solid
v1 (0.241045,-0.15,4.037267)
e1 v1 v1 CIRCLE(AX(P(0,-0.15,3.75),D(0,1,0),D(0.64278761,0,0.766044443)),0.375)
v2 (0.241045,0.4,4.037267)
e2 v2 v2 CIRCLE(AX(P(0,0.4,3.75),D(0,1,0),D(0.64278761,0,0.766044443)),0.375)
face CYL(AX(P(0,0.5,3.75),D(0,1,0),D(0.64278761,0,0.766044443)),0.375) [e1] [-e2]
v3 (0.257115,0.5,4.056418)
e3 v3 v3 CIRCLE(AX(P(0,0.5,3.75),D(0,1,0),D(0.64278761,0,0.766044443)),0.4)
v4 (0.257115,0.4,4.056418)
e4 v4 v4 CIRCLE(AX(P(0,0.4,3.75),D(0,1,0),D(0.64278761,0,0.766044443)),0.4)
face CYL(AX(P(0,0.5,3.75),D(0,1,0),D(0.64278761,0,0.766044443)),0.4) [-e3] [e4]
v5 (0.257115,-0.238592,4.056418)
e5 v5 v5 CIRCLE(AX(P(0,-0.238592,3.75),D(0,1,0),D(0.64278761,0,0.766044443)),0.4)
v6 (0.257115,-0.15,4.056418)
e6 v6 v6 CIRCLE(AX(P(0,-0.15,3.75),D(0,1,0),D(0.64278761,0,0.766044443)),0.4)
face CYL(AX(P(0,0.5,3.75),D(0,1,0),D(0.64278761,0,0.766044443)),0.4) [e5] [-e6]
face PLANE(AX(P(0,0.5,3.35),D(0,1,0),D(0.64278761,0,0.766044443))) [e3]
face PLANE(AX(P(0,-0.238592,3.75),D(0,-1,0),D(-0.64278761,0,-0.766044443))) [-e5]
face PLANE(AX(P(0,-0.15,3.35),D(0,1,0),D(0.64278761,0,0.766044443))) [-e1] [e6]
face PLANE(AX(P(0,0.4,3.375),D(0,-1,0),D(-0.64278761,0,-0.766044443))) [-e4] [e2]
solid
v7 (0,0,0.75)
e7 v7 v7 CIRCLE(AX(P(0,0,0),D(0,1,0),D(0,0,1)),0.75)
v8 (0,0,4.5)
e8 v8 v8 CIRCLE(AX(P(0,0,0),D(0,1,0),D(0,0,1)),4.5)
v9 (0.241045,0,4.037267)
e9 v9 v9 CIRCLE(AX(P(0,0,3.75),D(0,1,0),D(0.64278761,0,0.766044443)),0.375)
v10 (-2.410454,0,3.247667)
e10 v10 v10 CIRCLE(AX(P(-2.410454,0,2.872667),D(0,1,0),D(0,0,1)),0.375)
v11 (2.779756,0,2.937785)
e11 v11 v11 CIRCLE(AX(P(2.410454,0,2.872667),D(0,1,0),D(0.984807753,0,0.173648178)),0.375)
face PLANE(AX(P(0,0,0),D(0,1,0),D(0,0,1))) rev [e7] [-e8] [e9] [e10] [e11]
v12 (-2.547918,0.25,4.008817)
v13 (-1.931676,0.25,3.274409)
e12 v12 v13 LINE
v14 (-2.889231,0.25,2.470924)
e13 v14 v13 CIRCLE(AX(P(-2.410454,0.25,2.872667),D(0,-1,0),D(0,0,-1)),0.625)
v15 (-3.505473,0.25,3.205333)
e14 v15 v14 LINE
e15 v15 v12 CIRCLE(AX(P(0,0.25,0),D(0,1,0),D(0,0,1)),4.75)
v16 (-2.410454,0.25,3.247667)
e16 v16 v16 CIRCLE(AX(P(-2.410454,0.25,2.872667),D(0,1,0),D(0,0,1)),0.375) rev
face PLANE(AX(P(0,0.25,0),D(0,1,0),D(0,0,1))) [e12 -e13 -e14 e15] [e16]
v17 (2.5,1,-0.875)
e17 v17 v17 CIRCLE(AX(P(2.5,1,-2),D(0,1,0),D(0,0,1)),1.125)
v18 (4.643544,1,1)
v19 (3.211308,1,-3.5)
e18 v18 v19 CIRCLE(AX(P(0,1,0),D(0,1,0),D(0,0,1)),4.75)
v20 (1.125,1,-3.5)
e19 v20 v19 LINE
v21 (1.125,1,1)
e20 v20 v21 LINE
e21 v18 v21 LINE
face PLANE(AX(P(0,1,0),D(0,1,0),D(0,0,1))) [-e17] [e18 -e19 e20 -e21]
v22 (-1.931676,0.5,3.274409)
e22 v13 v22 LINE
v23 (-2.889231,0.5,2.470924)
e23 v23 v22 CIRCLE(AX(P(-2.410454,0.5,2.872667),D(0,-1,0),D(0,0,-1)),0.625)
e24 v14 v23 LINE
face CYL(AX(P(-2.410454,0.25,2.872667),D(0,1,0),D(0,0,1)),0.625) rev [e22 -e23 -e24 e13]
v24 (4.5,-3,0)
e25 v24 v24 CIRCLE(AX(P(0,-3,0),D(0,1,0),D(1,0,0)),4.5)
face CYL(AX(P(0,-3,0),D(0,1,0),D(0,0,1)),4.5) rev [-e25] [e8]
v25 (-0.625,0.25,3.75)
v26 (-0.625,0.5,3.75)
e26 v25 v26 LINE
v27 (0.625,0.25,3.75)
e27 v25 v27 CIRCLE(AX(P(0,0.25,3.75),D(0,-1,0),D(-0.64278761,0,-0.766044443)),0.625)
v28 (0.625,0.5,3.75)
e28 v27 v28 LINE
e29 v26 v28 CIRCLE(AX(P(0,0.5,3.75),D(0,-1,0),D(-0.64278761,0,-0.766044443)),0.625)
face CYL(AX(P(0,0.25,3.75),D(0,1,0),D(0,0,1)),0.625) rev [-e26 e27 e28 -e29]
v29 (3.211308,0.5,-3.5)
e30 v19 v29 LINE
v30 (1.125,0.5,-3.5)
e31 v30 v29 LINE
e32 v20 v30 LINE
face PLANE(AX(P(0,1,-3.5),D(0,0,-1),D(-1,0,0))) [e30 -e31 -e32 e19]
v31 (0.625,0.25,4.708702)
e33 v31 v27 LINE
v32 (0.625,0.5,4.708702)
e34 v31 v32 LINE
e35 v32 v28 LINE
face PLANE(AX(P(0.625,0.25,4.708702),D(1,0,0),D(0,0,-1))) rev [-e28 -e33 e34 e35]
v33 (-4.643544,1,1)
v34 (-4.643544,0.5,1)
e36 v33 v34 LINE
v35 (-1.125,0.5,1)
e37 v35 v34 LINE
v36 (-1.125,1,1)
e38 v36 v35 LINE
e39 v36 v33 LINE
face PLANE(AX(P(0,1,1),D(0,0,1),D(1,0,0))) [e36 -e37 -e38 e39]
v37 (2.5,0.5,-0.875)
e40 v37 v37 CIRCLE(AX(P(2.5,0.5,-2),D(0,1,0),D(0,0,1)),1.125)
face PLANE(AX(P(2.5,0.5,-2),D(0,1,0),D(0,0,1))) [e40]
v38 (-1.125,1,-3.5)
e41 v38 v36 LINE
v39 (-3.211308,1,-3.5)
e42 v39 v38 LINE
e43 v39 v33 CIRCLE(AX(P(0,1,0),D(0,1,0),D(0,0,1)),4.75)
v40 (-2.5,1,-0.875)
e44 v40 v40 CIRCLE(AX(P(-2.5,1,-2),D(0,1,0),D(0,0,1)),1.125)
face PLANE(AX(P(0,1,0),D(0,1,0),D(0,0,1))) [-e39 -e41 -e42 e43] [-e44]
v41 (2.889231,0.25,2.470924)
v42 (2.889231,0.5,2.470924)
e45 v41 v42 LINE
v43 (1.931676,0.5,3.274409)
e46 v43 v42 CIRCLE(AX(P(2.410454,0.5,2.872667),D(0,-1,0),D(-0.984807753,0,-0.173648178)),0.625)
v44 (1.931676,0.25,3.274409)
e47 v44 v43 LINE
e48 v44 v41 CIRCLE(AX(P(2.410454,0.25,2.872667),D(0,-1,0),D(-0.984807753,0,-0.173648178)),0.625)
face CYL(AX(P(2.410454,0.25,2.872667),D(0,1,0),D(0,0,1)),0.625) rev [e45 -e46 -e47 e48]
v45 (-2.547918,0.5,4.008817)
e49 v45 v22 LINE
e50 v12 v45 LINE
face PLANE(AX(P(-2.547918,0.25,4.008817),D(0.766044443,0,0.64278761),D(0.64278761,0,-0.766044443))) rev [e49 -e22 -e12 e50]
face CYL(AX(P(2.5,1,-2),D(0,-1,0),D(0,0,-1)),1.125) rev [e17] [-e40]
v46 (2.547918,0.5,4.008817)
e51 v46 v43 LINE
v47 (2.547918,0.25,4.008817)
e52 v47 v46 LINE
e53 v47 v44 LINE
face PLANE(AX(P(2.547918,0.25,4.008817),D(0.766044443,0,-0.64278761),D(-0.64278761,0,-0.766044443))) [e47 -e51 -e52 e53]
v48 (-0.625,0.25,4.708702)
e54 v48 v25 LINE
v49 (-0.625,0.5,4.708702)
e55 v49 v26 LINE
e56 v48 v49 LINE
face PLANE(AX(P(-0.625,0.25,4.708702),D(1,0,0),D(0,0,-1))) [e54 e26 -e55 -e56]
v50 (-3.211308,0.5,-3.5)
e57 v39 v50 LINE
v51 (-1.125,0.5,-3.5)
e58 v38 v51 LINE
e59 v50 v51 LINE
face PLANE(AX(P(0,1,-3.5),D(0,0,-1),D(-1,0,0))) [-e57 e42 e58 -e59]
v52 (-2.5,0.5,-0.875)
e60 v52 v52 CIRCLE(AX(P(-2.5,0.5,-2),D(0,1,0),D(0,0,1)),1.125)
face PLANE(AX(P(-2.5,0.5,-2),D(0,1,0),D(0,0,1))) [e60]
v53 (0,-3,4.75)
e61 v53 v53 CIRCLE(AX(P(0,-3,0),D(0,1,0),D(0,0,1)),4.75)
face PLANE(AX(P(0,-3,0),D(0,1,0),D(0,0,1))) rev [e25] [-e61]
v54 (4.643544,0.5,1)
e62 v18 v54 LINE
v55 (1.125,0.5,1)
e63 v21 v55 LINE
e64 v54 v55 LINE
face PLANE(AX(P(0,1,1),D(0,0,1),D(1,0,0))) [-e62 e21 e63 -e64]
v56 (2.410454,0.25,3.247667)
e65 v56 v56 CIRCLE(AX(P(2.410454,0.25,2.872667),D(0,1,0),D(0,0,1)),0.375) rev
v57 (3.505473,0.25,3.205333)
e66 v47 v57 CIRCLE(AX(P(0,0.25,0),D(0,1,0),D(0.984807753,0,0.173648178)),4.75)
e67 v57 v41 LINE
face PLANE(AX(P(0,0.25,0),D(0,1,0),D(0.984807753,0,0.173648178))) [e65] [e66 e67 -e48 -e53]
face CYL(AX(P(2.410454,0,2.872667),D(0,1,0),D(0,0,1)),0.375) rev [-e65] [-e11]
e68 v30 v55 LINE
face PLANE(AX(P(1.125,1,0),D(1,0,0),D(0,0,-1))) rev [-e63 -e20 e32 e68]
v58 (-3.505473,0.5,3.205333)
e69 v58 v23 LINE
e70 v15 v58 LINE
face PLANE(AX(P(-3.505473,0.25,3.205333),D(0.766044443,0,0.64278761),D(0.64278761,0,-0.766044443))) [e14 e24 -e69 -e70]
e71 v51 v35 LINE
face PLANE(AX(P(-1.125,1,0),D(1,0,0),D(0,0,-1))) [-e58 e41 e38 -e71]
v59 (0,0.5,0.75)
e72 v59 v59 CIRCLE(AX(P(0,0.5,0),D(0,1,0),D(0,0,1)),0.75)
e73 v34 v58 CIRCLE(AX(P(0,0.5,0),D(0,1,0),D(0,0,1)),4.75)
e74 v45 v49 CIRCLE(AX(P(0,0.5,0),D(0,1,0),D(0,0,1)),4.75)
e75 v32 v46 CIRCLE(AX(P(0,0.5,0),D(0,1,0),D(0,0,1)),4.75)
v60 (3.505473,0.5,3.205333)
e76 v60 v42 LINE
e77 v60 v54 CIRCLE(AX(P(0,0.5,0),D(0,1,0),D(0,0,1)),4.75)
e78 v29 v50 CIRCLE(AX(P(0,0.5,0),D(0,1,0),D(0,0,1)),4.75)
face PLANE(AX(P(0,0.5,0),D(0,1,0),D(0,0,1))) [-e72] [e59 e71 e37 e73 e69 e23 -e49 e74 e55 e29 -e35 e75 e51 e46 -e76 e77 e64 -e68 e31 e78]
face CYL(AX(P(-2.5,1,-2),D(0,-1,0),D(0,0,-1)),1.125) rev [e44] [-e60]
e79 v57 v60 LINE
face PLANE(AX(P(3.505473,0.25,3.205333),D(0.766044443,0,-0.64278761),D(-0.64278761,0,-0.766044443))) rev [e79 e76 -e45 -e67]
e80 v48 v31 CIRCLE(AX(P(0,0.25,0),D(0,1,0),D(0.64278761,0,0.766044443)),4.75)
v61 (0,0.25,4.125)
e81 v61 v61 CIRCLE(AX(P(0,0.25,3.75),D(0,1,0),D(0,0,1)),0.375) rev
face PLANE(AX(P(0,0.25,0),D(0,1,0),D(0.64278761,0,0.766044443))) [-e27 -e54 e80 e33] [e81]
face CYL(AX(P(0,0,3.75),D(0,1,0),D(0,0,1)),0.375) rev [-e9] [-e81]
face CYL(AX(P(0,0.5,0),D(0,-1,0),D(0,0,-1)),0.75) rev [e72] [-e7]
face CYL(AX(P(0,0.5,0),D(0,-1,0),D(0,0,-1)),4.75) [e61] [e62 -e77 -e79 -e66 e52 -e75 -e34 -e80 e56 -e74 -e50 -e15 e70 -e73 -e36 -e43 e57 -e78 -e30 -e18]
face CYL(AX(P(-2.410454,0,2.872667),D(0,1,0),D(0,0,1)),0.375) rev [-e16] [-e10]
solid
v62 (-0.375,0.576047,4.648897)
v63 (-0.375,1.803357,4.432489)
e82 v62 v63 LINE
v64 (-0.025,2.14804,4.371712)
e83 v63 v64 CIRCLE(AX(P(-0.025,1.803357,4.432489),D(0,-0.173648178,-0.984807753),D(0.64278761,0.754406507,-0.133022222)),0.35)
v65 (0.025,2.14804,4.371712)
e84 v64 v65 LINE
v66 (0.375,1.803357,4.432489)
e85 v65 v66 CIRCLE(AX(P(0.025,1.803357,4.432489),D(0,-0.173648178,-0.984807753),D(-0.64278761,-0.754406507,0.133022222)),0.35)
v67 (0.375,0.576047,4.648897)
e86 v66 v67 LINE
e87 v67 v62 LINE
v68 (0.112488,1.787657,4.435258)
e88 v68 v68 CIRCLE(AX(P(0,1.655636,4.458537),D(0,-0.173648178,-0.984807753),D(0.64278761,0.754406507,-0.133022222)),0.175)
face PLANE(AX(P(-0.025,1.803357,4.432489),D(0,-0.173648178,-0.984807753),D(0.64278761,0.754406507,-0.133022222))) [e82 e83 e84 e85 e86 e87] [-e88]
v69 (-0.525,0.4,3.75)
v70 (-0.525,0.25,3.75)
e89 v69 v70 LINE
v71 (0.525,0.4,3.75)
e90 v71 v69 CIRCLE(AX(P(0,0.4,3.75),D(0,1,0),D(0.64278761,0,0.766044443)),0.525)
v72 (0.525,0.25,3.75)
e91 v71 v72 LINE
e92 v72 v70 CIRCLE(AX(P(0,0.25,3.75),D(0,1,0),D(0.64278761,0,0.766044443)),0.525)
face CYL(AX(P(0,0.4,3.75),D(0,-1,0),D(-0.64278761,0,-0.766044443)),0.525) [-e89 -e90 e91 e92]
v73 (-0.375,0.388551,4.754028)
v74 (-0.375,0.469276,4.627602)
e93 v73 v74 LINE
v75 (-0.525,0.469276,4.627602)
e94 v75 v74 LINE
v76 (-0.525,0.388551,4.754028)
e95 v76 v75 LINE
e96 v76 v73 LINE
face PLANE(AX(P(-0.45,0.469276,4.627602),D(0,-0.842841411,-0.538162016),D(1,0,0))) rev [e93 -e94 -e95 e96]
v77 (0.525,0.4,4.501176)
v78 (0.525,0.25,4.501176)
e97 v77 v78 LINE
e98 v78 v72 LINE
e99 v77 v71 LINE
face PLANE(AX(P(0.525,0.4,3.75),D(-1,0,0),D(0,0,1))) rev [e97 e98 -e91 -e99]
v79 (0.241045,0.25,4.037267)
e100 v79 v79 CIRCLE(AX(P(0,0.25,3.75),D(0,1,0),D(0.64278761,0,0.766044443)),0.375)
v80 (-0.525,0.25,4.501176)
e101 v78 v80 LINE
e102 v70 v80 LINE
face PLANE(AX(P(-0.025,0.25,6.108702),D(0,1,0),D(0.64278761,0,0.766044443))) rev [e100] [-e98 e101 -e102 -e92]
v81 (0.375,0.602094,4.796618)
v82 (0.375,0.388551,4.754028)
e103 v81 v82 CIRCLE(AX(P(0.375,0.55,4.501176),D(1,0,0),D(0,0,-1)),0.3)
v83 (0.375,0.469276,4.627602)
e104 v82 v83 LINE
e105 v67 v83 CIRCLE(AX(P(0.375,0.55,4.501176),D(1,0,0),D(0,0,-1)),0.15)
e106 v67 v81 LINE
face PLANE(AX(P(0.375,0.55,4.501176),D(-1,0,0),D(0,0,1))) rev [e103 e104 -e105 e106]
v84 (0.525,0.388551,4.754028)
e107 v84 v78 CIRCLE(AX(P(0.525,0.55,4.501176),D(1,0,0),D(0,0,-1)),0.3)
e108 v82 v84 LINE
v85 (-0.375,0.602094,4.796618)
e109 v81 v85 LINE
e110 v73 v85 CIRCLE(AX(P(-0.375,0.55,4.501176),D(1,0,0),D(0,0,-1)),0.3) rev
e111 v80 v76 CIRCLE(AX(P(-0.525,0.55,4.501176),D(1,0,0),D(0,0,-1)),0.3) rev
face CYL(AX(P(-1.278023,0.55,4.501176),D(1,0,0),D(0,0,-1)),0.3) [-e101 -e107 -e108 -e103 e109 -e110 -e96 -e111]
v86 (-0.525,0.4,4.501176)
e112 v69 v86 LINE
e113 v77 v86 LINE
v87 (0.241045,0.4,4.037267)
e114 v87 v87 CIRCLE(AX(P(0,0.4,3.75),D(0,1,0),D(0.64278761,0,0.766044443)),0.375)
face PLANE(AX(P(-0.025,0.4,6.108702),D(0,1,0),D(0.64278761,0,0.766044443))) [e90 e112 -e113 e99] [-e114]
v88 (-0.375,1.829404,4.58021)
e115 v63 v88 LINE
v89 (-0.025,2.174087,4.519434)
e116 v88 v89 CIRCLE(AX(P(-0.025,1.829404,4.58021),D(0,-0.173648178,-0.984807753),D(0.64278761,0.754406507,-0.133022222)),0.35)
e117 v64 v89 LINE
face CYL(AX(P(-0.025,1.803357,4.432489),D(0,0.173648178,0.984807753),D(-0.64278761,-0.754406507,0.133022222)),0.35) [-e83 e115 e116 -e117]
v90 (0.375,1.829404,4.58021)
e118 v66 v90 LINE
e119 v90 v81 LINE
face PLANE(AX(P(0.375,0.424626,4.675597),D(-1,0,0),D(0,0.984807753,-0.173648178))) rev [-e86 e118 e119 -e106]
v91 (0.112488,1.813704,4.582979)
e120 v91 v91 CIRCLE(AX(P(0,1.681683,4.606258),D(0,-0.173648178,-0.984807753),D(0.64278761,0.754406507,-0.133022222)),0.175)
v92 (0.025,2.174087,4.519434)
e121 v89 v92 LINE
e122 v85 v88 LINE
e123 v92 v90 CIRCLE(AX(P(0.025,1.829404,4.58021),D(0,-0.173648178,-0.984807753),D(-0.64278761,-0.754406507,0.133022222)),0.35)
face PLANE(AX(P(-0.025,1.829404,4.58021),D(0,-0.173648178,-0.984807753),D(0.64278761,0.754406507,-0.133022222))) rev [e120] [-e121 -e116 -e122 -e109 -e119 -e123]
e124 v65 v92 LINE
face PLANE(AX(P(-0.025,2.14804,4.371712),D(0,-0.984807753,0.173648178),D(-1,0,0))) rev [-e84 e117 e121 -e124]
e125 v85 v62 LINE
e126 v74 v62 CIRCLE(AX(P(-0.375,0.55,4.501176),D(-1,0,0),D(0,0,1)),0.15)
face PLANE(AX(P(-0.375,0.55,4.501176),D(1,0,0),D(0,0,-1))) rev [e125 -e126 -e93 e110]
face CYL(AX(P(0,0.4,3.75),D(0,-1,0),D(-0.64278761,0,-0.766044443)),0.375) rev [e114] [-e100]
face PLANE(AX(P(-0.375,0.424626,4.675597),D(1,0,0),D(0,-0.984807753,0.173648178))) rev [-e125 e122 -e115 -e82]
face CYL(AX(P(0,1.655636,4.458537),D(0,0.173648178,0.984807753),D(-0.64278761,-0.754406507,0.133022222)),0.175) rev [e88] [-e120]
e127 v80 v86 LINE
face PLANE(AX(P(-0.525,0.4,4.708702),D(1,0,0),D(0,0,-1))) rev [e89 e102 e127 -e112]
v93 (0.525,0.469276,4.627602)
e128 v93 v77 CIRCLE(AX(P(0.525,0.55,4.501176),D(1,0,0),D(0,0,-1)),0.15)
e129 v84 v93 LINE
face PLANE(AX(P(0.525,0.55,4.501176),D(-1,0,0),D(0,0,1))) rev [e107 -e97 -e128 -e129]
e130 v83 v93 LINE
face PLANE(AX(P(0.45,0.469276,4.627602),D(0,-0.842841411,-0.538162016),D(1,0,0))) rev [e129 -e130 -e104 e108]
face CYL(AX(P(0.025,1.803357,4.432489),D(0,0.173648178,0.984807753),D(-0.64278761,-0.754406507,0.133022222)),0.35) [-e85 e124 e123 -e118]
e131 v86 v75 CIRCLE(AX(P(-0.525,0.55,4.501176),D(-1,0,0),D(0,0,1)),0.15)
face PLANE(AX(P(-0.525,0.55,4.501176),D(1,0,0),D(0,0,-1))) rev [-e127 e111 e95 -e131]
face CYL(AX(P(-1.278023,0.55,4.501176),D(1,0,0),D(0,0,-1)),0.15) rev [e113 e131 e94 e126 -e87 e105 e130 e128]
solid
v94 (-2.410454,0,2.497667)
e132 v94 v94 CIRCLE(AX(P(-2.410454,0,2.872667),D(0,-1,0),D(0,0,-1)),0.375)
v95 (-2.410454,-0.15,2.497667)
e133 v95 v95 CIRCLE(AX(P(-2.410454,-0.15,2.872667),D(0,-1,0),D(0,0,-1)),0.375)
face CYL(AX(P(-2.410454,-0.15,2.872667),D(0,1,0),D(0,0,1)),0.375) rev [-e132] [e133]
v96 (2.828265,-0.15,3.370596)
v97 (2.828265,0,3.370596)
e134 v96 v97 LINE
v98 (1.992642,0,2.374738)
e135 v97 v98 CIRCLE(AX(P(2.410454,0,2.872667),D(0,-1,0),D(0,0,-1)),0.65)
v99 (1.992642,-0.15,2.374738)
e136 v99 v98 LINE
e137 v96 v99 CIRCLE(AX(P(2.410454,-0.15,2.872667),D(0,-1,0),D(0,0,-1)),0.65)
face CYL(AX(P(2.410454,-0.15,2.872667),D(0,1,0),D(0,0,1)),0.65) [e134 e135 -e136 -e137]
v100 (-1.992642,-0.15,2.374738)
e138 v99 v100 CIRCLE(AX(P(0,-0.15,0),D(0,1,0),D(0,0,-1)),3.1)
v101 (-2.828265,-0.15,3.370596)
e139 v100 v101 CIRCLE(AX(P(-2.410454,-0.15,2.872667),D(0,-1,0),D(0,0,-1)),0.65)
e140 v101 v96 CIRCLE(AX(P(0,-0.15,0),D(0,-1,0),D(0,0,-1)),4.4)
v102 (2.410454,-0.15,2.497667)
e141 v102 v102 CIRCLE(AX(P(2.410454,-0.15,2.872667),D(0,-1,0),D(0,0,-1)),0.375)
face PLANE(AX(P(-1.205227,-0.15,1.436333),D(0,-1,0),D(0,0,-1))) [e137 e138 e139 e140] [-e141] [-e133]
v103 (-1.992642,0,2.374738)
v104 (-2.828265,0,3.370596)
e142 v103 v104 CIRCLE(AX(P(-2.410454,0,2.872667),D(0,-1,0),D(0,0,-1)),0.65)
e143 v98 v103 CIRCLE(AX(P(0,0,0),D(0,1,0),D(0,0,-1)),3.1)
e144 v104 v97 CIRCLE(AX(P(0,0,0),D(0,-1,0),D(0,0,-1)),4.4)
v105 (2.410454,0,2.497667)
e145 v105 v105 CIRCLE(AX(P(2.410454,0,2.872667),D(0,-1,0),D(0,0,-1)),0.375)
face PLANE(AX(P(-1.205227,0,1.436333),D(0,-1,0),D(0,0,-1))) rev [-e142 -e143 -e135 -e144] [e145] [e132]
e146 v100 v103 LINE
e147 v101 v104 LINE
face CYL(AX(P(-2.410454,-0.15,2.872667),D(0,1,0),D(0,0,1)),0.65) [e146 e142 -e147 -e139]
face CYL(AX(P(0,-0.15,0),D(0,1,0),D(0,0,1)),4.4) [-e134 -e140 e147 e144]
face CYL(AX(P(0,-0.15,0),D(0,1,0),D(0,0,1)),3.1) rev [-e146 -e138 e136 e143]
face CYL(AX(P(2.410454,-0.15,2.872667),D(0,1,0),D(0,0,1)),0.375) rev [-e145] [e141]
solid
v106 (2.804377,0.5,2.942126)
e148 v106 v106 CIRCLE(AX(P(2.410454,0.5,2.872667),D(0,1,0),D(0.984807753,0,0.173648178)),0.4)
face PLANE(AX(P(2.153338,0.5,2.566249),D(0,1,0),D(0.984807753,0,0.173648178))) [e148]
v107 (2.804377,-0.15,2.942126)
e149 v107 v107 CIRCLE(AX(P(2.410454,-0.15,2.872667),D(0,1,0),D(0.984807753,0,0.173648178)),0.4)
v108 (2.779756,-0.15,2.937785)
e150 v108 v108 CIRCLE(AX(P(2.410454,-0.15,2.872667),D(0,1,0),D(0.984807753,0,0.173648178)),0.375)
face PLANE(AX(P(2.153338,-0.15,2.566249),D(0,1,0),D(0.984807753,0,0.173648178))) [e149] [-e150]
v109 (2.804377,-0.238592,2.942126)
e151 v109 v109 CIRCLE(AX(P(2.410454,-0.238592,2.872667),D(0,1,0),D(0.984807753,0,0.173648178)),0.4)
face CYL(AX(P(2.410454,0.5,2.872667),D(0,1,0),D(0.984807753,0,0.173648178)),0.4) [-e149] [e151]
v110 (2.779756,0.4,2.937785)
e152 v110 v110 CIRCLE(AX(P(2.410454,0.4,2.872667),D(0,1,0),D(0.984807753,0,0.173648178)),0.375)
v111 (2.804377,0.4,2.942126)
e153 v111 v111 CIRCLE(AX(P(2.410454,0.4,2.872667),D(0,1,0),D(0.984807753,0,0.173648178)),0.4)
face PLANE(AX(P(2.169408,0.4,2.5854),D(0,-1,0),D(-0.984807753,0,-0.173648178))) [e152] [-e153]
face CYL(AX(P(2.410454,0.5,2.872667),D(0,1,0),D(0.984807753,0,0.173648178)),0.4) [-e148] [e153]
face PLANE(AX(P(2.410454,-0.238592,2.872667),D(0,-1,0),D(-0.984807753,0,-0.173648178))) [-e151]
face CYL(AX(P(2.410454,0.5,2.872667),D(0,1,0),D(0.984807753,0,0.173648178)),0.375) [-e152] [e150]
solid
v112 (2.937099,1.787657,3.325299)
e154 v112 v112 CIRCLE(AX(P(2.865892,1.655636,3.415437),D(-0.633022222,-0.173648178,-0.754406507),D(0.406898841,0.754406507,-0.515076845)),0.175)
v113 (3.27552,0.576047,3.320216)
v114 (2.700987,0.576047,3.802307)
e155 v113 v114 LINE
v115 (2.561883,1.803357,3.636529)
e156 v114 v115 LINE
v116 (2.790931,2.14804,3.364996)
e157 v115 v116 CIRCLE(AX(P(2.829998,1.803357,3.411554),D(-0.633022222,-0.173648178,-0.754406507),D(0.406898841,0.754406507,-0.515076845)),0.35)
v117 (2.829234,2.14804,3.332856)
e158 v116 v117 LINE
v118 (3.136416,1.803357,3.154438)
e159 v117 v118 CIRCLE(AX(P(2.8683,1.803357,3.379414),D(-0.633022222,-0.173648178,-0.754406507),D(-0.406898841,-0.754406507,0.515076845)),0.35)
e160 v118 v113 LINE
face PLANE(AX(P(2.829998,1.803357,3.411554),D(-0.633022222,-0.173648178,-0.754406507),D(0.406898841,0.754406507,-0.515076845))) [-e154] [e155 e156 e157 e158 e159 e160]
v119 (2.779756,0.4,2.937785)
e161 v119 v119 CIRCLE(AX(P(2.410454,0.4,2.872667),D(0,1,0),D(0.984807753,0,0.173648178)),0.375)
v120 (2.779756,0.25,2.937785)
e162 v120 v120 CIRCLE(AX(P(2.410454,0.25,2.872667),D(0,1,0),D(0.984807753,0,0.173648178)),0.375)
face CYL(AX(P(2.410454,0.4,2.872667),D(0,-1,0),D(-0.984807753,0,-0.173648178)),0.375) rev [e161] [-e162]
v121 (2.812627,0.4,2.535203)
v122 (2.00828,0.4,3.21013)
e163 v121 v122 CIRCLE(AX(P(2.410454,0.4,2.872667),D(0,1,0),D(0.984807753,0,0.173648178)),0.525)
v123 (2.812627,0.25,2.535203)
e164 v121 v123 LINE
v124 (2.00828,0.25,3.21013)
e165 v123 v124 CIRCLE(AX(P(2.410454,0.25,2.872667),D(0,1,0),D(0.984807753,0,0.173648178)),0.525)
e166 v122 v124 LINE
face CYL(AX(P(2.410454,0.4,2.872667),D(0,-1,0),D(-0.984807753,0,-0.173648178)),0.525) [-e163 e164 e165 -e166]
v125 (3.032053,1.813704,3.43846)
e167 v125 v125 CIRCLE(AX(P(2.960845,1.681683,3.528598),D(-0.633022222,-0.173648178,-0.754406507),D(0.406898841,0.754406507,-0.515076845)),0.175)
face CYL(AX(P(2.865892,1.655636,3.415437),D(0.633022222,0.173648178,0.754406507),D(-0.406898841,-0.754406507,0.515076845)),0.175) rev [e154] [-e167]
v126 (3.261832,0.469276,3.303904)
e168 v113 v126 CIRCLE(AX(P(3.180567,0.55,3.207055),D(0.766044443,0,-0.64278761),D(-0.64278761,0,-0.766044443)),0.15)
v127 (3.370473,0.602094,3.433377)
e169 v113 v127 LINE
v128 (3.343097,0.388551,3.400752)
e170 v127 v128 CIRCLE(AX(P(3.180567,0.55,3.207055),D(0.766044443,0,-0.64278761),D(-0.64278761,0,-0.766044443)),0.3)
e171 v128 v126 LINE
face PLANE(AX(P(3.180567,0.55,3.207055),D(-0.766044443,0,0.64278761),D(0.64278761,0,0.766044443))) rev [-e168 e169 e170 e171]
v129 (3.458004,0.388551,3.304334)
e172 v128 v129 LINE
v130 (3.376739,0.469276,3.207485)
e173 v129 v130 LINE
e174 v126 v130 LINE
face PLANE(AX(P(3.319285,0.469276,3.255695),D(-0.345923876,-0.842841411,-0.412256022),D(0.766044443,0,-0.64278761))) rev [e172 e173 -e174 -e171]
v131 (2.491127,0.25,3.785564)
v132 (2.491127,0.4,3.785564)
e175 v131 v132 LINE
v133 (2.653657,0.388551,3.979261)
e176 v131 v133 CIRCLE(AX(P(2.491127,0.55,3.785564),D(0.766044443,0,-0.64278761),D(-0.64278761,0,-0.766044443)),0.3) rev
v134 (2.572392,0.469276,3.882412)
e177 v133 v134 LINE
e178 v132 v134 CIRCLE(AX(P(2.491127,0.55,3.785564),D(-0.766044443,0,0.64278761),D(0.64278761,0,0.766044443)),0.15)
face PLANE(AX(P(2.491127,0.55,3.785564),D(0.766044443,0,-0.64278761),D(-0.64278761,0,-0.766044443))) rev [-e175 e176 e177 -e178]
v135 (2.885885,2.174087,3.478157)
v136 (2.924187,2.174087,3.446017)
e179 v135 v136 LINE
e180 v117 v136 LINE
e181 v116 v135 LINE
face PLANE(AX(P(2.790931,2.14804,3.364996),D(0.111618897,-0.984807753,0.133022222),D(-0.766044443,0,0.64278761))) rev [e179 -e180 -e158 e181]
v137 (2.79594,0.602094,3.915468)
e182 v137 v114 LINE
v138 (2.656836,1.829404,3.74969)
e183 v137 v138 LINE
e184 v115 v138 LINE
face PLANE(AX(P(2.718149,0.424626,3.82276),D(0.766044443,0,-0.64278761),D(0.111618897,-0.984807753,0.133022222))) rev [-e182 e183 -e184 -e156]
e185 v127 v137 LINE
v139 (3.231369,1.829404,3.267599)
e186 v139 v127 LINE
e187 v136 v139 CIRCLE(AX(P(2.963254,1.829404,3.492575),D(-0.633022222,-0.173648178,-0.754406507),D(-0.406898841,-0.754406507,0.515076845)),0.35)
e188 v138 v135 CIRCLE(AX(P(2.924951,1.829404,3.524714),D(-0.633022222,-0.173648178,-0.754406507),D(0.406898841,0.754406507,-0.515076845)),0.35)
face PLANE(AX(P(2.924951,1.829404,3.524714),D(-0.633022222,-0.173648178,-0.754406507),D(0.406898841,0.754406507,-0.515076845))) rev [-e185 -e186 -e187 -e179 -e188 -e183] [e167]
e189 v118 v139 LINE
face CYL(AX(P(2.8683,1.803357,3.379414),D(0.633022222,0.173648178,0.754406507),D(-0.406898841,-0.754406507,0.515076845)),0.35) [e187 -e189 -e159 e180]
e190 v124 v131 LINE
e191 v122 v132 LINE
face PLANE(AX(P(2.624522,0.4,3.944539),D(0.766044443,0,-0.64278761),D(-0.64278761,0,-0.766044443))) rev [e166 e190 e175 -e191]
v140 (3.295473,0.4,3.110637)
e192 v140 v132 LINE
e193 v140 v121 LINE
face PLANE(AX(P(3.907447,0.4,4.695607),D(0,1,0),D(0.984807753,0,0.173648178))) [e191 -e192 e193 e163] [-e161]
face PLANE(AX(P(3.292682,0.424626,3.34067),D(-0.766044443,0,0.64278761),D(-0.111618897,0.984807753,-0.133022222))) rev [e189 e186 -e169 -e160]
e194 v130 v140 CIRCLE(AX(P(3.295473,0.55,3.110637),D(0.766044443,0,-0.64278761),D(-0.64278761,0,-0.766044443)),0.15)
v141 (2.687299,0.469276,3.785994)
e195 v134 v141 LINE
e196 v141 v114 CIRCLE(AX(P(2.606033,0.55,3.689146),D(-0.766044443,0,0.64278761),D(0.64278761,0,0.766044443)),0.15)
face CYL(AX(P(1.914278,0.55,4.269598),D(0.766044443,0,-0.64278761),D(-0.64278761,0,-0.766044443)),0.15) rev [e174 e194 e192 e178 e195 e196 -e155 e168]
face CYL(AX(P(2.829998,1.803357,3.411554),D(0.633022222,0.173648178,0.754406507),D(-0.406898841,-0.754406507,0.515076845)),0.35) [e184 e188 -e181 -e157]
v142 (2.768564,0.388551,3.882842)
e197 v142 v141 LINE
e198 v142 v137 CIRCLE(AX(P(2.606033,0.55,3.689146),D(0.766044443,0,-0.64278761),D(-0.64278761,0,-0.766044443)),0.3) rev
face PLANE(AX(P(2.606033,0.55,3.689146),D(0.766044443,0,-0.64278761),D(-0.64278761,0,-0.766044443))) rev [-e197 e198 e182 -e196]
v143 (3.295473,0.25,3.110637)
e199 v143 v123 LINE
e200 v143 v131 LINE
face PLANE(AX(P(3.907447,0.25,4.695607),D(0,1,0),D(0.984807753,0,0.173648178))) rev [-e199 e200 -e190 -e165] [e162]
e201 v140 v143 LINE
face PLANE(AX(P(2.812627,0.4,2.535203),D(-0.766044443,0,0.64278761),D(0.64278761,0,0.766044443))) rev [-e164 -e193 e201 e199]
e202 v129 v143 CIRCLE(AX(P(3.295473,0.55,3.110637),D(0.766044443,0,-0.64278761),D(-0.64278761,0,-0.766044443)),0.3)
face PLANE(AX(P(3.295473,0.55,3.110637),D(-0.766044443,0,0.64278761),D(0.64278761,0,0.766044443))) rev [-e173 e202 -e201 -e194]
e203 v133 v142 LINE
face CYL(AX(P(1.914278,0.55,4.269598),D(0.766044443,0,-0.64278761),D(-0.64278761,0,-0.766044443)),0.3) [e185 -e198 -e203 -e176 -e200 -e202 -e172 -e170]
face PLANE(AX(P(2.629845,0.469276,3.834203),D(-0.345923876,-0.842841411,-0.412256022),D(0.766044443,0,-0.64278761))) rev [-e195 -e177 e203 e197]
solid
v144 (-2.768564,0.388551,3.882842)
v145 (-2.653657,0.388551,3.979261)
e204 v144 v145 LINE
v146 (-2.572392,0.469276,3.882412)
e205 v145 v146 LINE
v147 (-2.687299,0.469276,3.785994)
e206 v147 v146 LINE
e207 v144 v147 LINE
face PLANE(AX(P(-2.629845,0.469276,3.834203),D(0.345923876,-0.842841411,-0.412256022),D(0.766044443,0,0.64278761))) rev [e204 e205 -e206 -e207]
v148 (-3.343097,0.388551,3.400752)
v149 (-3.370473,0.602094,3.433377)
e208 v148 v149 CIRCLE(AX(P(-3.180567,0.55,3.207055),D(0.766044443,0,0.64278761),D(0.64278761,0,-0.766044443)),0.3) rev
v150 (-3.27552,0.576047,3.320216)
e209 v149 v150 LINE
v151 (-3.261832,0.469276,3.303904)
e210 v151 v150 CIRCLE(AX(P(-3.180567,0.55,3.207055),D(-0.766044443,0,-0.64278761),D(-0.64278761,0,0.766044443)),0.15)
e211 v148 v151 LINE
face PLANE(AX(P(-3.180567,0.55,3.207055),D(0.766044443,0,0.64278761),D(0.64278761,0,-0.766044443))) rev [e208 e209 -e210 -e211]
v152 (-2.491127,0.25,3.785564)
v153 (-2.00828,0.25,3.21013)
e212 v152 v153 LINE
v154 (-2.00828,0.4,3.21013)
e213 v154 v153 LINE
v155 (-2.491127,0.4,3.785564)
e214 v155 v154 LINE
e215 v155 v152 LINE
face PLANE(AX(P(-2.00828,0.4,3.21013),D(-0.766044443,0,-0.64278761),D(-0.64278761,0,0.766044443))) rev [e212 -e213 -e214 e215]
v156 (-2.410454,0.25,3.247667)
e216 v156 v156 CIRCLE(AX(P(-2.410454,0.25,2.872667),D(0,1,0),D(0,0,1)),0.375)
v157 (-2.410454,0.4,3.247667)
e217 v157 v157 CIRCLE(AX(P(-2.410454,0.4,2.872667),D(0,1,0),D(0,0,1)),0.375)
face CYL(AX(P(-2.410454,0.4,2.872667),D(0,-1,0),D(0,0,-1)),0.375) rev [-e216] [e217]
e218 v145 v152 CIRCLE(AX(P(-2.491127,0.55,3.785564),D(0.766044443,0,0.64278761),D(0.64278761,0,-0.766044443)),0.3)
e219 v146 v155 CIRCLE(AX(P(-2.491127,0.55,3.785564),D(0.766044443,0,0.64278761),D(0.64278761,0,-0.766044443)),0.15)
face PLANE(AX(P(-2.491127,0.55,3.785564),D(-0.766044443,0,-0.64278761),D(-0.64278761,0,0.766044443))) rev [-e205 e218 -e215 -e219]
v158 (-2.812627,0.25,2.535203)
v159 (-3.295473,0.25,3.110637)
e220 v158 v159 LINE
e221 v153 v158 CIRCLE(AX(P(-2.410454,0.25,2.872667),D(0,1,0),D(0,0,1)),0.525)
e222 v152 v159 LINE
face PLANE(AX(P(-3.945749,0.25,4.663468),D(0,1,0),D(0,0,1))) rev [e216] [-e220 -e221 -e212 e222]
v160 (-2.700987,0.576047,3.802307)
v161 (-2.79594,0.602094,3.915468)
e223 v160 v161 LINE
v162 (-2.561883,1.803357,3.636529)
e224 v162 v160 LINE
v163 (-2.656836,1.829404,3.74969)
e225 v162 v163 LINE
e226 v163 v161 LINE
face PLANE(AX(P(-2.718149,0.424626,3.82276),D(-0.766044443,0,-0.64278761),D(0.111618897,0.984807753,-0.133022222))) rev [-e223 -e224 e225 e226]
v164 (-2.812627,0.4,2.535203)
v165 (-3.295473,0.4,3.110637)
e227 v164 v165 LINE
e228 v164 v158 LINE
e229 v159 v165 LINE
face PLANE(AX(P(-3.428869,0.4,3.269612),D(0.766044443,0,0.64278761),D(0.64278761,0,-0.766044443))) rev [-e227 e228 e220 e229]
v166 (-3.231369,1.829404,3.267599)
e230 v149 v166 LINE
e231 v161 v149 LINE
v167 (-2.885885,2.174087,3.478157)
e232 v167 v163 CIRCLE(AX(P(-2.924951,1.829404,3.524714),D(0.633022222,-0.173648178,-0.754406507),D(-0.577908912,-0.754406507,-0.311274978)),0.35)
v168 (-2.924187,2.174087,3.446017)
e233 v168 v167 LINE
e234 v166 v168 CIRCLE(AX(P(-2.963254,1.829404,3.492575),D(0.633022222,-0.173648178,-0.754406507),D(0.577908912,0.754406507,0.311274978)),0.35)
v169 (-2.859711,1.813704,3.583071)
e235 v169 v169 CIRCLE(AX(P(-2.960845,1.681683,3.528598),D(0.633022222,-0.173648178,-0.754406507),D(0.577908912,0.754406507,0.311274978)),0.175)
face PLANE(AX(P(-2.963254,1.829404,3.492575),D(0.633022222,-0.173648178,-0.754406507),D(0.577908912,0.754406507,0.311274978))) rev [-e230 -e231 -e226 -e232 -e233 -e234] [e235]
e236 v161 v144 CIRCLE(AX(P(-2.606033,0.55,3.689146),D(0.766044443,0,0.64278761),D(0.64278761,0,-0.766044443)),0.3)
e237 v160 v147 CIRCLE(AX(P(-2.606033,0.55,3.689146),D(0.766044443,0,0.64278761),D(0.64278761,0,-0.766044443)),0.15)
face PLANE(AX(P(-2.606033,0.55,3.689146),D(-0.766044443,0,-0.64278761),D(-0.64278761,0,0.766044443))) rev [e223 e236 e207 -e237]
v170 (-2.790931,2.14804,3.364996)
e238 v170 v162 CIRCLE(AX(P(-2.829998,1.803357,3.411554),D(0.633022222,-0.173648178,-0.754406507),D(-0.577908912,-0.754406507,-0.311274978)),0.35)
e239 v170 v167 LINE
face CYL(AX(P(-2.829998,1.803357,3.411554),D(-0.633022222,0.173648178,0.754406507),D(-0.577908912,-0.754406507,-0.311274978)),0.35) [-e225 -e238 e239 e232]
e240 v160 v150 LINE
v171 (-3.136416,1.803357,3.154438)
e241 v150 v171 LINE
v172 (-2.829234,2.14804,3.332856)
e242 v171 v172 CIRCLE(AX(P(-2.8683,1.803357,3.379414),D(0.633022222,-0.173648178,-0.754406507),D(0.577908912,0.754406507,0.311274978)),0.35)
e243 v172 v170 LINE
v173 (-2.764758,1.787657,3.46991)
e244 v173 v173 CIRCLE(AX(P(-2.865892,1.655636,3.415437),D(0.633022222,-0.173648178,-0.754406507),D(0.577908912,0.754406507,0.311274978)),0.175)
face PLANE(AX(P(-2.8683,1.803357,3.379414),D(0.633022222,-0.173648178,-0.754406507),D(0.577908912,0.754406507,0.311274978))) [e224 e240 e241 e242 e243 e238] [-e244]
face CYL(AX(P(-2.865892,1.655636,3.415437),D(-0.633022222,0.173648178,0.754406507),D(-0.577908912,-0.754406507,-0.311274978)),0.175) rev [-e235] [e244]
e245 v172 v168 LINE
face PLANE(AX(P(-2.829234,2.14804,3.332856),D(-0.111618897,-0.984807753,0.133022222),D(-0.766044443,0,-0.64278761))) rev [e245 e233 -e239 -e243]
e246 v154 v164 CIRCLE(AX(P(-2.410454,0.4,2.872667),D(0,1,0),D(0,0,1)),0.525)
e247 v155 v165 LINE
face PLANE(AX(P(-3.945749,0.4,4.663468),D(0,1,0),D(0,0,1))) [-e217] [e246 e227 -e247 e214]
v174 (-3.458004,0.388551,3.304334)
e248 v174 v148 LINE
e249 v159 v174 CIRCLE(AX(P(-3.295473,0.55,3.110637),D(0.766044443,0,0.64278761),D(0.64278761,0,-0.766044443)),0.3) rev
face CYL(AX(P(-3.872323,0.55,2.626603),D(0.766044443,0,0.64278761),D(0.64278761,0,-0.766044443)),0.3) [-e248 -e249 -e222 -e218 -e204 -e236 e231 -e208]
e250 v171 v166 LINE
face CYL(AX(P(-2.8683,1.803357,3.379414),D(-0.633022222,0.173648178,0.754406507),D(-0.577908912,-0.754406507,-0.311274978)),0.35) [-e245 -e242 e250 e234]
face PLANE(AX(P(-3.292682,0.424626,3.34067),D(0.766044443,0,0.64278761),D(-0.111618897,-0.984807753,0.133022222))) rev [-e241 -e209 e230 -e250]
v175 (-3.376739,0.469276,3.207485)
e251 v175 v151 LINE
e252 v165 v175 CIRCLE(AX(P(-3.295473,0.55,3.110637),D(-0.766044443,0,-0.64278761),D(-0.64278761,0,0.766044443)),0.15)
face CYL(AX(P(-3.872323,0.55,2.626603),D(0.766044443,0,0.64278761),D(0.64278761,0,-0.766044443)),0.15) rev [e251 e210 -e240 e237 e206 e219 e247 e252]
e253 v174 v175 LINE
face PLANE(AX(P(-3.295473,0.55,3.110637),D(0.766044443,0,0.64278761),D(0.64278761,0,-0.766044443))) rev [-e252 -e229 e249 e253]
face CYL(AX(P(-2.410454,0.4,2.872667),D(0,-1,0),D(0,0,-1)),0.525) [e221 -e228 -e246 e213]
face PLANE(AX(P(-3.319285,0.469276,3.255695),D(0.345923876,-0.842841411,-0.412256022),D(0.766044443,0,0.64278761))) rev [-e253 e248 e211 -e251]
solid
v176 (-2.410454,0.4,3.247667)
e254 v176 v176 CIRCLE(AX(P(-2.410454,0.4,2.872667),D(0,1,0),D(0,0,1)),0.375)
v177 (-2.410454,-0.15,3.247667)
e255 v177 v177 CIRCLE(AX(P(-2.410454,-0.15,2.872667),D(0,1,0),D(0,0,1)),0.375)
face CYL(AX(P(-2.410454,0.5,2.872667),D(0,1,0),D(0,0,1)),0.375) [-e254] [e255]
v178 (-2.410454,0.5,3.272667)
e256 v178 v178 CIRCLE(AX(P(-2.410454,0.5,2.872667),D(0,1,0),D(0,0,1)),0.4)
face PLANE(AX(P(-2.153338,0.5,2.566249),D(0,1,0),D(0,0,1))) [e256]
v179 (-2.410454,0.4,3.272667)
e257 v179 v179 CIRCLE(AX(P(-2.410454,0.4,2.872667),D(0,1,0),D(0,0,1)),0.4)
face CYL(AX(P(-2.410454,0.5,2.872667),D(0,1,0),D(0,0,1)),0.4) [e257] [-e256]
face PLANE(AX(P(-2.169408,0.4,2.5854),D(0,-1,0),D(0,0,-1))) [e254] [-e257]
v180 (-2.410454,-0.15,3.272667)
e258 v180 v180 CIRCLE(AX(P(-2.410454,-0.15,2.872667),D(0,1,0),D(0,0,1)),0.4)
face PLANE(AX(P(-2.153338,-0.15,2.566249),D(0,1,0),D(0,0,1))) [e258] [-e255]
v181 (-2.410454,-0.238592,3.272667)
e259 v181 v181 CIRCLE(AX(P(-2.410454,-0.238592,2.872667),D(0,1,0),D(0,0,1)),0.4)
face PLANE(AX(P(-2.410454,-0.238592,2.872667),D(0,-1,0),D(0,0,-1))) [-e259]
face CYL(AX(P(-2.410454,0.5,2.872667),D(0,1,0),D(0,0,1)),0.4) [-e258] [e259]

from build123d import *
from build123d.topology import SkipClean

# Parameters (mm, degrees)
SKETCH1_R                  = 0.75
BOSS_EXTRUDE2_DEPTH        = 0.5
SKETCH1_4_R                = 1.125
BOSS_EXTRUDE3_DEPTH        = 1
SKETCH1_5_R                = 1.125
BOSS_EXTRUDE4_DEPTH        = 0.5
SKETCH1_6_R                = 1.125
BOSS_EXTRUDE5_DEPTH        = 0.5
SKETCH2_R                  = 0.375
CUT_EXTRUDE1_DEPTH         = 7.736096793
CUT_EXTRUDE2_START         = -0.25
CUT_EXTRUDE2_DEPTH         = 0.25
CIRPATTERN2_COUNT          = 3
CIRPATTERN2_ANGLE          = 80
EXTRUDE_THIN2_START        = -3
SKETCH1_8_R                = 4.75
SKETCH1_8_R_2              = 4.5
EXTRUDE_THIN2_DEPTH        = 3
BASE_FLANGE1_START         = 0.15
SKETCH4_R                  = 0.375
SKETCH4_R_2                = 0.175
BASE_FLANGE1_DEPTH         = 0.15
SKETCHED_START             = -0.525
SKETCHED_BEND1_DEPTH       = 1.05
SKETCHED_BEND1_2_DEPTH     = 1.05
SKETCHED_START_2           = -0.375
SKETCHED_BEND1_3_DEPTH     = 0.75
SKETCHED_START_3           = -4.828299493
SKETCHED_BEND1_4_OUTLINE_R = 0.175
SKETCHED_BEND1_4_DEPTH     = 0.149999999
SKETCH10_R                 = 0.375
BASE_FLANGE3_DEPTH         = 0.15
CIRPATTERN3_COUNT          = 3
CIRPATTERN3_ANGLE          = 80


with BuildPart() as part:
    # Sketch1 → Boss-Extrude2 (new body)
    with BuildSketch(Plane(origin=(0, 0, 0), x_dir=(1, 0, 0), z_dir=(0, 1, 0))):
        with BuildLine():
            Line((-1.125, 3.5), (-1.125, -1))
            Line((-1.125, -1), (-4.643543905, -1))
            ThreePointArc((-4.643543905, -1), (0, -4.75), (4.643543905, -1))
            Line((4.643543905, -1), (1.125, -1))
            Line((1.125, -1), (1.125, 3.5))
            Line((1.125, 3.5), (3.211308145, 3.5))
            ThreePointArc((3.211308145, 3.5), (0, 4.75), (-3.211308145, 3.5))
            Line((-3.211308145, 3.5), (-1.125, 3.5))
        make_face()
        with Locations(Location((0, 0, 0), (0, 0, 270))):
            Circle(SKETCH1_R, mode=Mode.SUBTRACT)
    extrude(amount=BOSS_EXTRUDE2_DEPTH)

    # Sketch1<4> → Boss-Extrude3 (add)
    # profile 1 of 2: a face of its own
    with BuildSketch(Plane(origin=(0, 0, 0), x_dir=(1, 0, 0), z_dir=(0, 1, 0))):
        with BuildLine():
            ThreePointArc((-3.211308145, 3.5), (-4.526276083, 1.440598771), (-4.643543905, -1))
            Line((-4.643543905, -1), (-1.125, -1))
            Line((-1.125, -1), (-1.125, 3.5))
            Line((-1.125, 3.5), (-3.211308145, 3.5))
        make_face()
        with Locations(Location((-2.5, 2, 0), (0, 0, 270))):
            Circle(SKETCH1_4_R, mode=Mode.SUBTRACT)
    # profile 2 of 2: a face of its own
    with BuildSketch(Plane(origin=(0, 0, 0), x_dir=(1, 0, 0), z_dir=(0, 1, 0))):
        with BuildLine():
            Line((1.125, -1), (4.643543905, -1))
            ThreePointArc((4.643543905, -1), (4.723310997, -0.502825243), (4.75, 0))
            ThreePointArc((4.75, 0), (4.348345299, 1.911646713), (3.211308145, 3.5))
            Line((3.211308145, 3.5), (1.125, 3.5))
            Line((1.125, 3.5), (1.125, -1))
        make_face()
        with Locations(Location((2.5, 2, 0), (0, 0, 270))):
            Circle(SKETCH1_4_R, mode=Mode.SUBTRACT)
    extrude(amount=BOSS_EXTRUDE3_DEPTH)

    # Sketch1<5> → Boss-Extrude4 (add)
    with BuildSketch(Plane(origin=(0, 0, 0), x_dir=(1, 0, 0), z_dir=(0, 1, 0))):
        with Locations(Location((2.5, 2, 0), (0, 0, 270))):
            Circle(SKETCH1_5_R)
    extrude(amount=BOSS_EXTRUDE4_DEPTH)

    # Sketch1<6> → Boss-Extrude5 (add)
    with BuildSketch(Plane(origin=(0, 0, 0), x_dir=(1, 0, 0), z_dir=(0, 1, 0))):
        with Locations(Location((-2.5, 2, 0), (0, 0, 270))):
            Circle(SKETCH1_6_R)
    extrude(amount=BOSS_EXTRUDE5_DEPTH)

    # Sketch2 → Cut-Extrude1 (cut, through all)
    with BuildSketch(Plane(origin=(0, 0.5, 0), x_dir=(1, 0, 0), z_dir=(0, 1, 0))):
        with Locations(Location((-2.410453536, -2.872666662, 0), (0, 0, 270))):
            Circle(SKETCH2_R)
    cut_extrude1 = extrude(amount=-CUT_EXTRUDE1_DEPTH, mode=Mode.SUBTRACT)

    # Sketch2<4> → Cut-Extrude2 (cut)
    with BuildSketch(Plane(origin=(0, 0.5, 0), x_dir=(1, 0, 0), z_dir=(0, 1, 0)).offset(CUT_EXTRUDE2_START)):
        with BuildLine():
            Line((-3.505473113, -3.205332784), (-2.889231313, -2.470924406))
            ThreePointArc((-2.889231313, -2.470924406), (-2.00871128, -2.393888885), (-1.931675759, -3.274408918))
            Line((-1.931675759, -3.274408918), (-2.547917559, -4.008817296))
            ThreePointArc((-2.547917559, -4.008817296), (-3.053241146, -3.638711105), (-3.505473113, -3.205332784))
        make_face()
    cut_extrude2 = extrude(amount=CUT_EXTRUDE2_DEPTH, mode=Mode.SUBTRACT)

    # CirPattern2: Cut-Extrude1, Cut-Extrude2 ×3 about axis
    cirpattern2_axis = Axis((0, 0, 0), (0, 1, 0))
    add([cut_extrude1.rotate(cirpattern2_axis, i * CIRPATTERN2_ANGLE / (CIRPATTERN2_COUNT - 1)) for i in range(1, CIRPATTERN2_COUNT)], mode=Mode.SUBTRACT)
    add([cut_extrude2.rotate(cirpattern2_axis, i * CIRPATTERN2_ANGLE / (CIRPATTERN2_COUNT - 1)) for i in range(1, CIRPATTERN2_COUNT)], mode=Mode.SUBTRACT)

    # Sketch1<8> → Extrude-Thin2 (add)
    with BuildSketch(Plane(origin=(0, 0, 0), x_dir=(1, 0, 0), z_dir=(0, 1, 0)).offset(EXTRUDE_THIN2_START)):
        Circle(SKETCH1_8_R)
        Circle(SKETCH1_8_R_2, mode=Mode.SUBTRACT)
    extrude(amount=EXTRUDE_THIN2_DEPTH)


with BuildPart() as body_2:
    # Base-Flange1: sheet metal written as solids
    # Sketch4 → Base-Flange1 (new body)
    with BuildSketch(Plane(origin=(0, 0.25, 0), x_dir=(1, 0, 0), z_dir=(0, 1, 0)).offset(BASE_FLANGE1_START)):
        with BuildLine():
            Line((-2.008280204, -3.210130157), (-2.624522003, -3.944538535))
            Line((-2.624522003, -3.944538535), (-2.73942867, -3.848120394))
            Line((-2.73942867, -3.848120394), (-3.639331323, -4.920582614))
            ThreePointArc((-3.639331323, -4.920582614), (-3.876942368, -5.044275095), (-4.132422542, -4.963722506))
            Line((-4.132422542, -4.963722506), (-4.170724764, -4.931583125))
            ThreePointArc((-4.170724764, -4.931583125), (-4.294417245, -4.69397208), (-4.213864655, -4.438491907))
            Line((-4.213864655, -4.438491907), (-3.313962002, -3.366029686))
            Line((-3.313962002, -3.366029686), (-3.428868668, -3.269611545))
            Line((-3.428868668, -3.269611545), (-2.812626869, -2.535203167))
            ThreePointArc((-2.812626869, -2.535203167), (-2.072990041, -2.470493329), (-2.008280204, -3.210130157))
        make_face()
        with Locations(Location((-2.410453536, -2.872666662, 0), (0, 0, 270))):
            Circle(SKETCH4_R, mode=Mode.SUBTRACT)
        with Locations(Location((-3.830179848, -4.564630594, 0), (0, 0, 270))):
            Circle(SKETCH4_R_2, mode=Mode.SUBTRACT)
    extrude(amount=-BASE_FLANGE1_DEPTH)

    # Sketched Bend1: read off the stored shape, not the designer's step
    # Sketched Bend1 outline → Sketched Bend1 (cut)
    with BuildSketch(Plane(origin=(0, 0, 0), x_dir=(0.642787609686537, 0, -0.76604444311898), z_dir=(0.76604444311898, 0, 0.642787609686537)).offset(SKETCHED_START)):
        with BuildLine():
            Line((-4.760983594, 0.4), (-6.45870205, 0.4))
            Line((-6.45870205, 0.4), (-6.45870205, 0.25))
            Line((-6.45870205, 0.25), (-4.501175973, 0.25))
            ThreePointArc((-4.501175973, 0.25), (-4.651175973, 0.290192379), (-4.760983594, 0.4))
        make_face()
    extrude(amount=SKETCHED_BEND1_DEPTH, mode=Mode.SUBTRACT)

    # Sketched Bend1 2 outline → Sketched Bend1 2 (add)
    with SkipClean():  # the faces are left unmerged after this step: merging them gives an invalid solid
        with BuildSketch(Plane(origin=(0, 0, 0), x_dir=(0.642787609686537, 0, -0.76604444311898), z_dir=(0.76604444311898, 0, 0.642787609686537)).offset(SKETCHED_START)):
            with BuildLine():
                ThreePointArc((-4.501175973, 0.4), (-4.57325702, 0.418454105), (-4.627602184, 0.469275698))
                Line((-4.627602184, 0.469275698), (-4.754028396, 0.388551395))
                ThreePointArc((-4.754028396, 0.388551395), (-4.73301345, 0.359602037), (-4.70870205, 0.333359913))
                Line((-4.70870205, 0.333359913), (-4.70870205, 0.4))
                Line((-4.70870205, 0.4), (-4.501175973, 0.4))
            make_face()
        extrude(amount=SKETCHED_BEND1_2_DEPTH)

    # Sketched Bend1 3 outline → Sketched Bend1 3 (add)
    with SkipClean():  # the faces are left unmerged after this step: merging them gives an invalid solid
        with BuildSketch(Plane(origin=(0, 0, 0), x_dir=(0.642787609686537, 0, -0.76604444311898), z_dir=(0.76604444311898, 0, 0.642787609686537)).offset(SKETCHED_START_2)):
            with BuildLine():
                ThreePointArc((-4.627602184, 0.469275698), (-4.648278779, 0.520661214), (-4.648897136, 0.576047227))
                Line((-4.648897136, 0.576047227), (-4.371712461, 2.148039633))
                Line((-4.371712461, 2.148039633), (-4.519433624, 2.174086859))
                Line((-4.519433624, 2.174086859), (-4.796618299, 0.602094453))
                ThreePointArc((-4.796618299, 0.602094453), (-4.796618299, 0.497905546), (-4.760983594, 0.4))
                Line((-4.760983594, 0.4), (-4.736098185, 0.4))
                Line((-4.736098185, 0.4), (-4.627602184, 0.469275698))
            make_face()
        extrude(amount=SKETCHED_BEND1_3_DEPTH)

    # Sketched Bend1 4 outline → Sketched Bend1 4 (cut)
    with SkipClean():  # the faces are left unmerged after this step: merging them gives an invalid solid
        with BuildSketch(Plane(origin=(0, 0, 0), x_dir=(0.7741336234862116, 0.1419950663058067, 0.6168910228986297), z_dir=(0.633022221559487, -0.173648177666934, -0.75440650673549)).offset(SKETCHED_START_3)):
            with BuildLine():
                Line((-0.175527489, -1.396163693), (0.170815245, -1.345698743))
                ThreePointArc((0.170815245, -1.345698743), (-0.088866892, -1.279941413), (-0.225992438, -1.049820959))
                Line((-0.225992438, -1.049820959), (-0.175527489, -1.396163693))
            make_face()
            with BuildLine():
                ThreePointArc((0.516170562, -0.941681782), (0.450413232, -1.201363919), (0.220292778, -1.338489465))
                Line((0.220292778, -1.338489465), (0.566635511, -1.288024516))
                Line((0.566635511, -1.288024516), (0.516170562, -0.941681782))
            make_face()
            with Locations((0.123461227, -0.847318771)):
                Circle(SKETCHED_BEND1_4_OUTLINE_R)
        extrude(amount=SKETCHED_BEND1_4_DEPTH, mode=Mode.SUBTRACT)


with BuildPart() as body_3:
    # Base-Flange3: sheet metal written as solids
    # Sketch10 → Base-Flange3 (new body)
    with BuildSketch(Plane.XZ):
        with BuildLine():
            ThreePointArc((-2.828265483, 3.37059555), (0, -4.4), (2.828265483, 3.37059555))
            ThreePointArc((2.828265483, 3.37059555), (1.912524648, 3.290478608), (1.99264159, 2.374737774))
            ThreePointArc((1.99264159, 2.374737774), (0, -3.1), (-1.99264159, 2.374737774))
            ThreePointArc((-1.99264159, 2.374737774), (-1.912524648, 3.290478608), (-2.828265483, 3.37059555))
        make_face()
        with Locations(Location((-2.410453536, 2.872666662, 0), (0, 0, 270))):
            Circle(SKETCH10_R, mode=Mode.SUBTRACT)
        with Locations(Location((2.410453536, 2.872666662, 0), (0, 0, 270))):
            Circle(SKETCH10_R, mode=Mode.SUBTRACT)
    extrude(amount=BASE_FLANGE3_DEPTH)


with BuildPart() as body_4:
    # Sketch16 → Revolve1 (revolve)
    with BuildSketch(Plane(origin=(0, 0, 0), x_dir=(-0.642787609686535, 0, 0.7660444431189818), z_dir=(-0.7660444431189817, 0, -0.6427876096865349)), mode=Mode.PRIVATE) as revolve1_sk:
        Polygon((3.375, 0.4), (3.35, 0.4), (3.35, 0.5), (3.75, 0.5), (3.75, -0.238591808), (3.35, -0.238591808), (3.35, -0.15), (3.375, -0.15), align=None)
    revolve(revolve1_sk.sketch.rotate(Axis((-2.410453536, 0.5, 2.872666662), (0, -1, 0)), 140), axis=Axis((-2.410453536, 0.5, 2.872666662), (0, -1, 0)))


with BuildPart() as cirpattern3_1:
    # CirPattern3: pattern copy
    add(body_4.part.rotate(Axis((0, 0, 0), (0, 1, 0)), 1 * CIRPATTERN3_ANGLE / (CIRPATTERN3_COUNT - 1)))


with BuildPart() as cirpattern3_2:
    # CirPattern3: pattern copy
    add(body_4.part.rotate(Axis((0, 0, 0), (0, 1, 0)), 2 * CIRPATTERN3_ANGLE / (CIRPATTERN3_COUNT - 1)))


with BuildPart() as cirpattern3_3:
    # CirPattern3: pattern copy
    add(body_2.part.rotate(Axis((0, 0, 0), (0, 1, 0)), 1 * CIRPATTERN3_ANGLE / (CIRPATTERN3_COUNT - 1)))


with BuildPart() as cirpattern3_4:
    # CirPattern3: pattern copy
    add(body_2.part.rotate(Axis((0, 0, 0), (0, 1, 0)), 2 * CIRPATTERN3_ANGLE / (CIRPATTERN3_COUNT - 1)))


solid = Compound([part.part, body_2.part, body_3.part, body_4.part, cirpattern3_1.part, cirpattern3_2.part, cirpattern3_3.part, cirpattern3_4.part])
